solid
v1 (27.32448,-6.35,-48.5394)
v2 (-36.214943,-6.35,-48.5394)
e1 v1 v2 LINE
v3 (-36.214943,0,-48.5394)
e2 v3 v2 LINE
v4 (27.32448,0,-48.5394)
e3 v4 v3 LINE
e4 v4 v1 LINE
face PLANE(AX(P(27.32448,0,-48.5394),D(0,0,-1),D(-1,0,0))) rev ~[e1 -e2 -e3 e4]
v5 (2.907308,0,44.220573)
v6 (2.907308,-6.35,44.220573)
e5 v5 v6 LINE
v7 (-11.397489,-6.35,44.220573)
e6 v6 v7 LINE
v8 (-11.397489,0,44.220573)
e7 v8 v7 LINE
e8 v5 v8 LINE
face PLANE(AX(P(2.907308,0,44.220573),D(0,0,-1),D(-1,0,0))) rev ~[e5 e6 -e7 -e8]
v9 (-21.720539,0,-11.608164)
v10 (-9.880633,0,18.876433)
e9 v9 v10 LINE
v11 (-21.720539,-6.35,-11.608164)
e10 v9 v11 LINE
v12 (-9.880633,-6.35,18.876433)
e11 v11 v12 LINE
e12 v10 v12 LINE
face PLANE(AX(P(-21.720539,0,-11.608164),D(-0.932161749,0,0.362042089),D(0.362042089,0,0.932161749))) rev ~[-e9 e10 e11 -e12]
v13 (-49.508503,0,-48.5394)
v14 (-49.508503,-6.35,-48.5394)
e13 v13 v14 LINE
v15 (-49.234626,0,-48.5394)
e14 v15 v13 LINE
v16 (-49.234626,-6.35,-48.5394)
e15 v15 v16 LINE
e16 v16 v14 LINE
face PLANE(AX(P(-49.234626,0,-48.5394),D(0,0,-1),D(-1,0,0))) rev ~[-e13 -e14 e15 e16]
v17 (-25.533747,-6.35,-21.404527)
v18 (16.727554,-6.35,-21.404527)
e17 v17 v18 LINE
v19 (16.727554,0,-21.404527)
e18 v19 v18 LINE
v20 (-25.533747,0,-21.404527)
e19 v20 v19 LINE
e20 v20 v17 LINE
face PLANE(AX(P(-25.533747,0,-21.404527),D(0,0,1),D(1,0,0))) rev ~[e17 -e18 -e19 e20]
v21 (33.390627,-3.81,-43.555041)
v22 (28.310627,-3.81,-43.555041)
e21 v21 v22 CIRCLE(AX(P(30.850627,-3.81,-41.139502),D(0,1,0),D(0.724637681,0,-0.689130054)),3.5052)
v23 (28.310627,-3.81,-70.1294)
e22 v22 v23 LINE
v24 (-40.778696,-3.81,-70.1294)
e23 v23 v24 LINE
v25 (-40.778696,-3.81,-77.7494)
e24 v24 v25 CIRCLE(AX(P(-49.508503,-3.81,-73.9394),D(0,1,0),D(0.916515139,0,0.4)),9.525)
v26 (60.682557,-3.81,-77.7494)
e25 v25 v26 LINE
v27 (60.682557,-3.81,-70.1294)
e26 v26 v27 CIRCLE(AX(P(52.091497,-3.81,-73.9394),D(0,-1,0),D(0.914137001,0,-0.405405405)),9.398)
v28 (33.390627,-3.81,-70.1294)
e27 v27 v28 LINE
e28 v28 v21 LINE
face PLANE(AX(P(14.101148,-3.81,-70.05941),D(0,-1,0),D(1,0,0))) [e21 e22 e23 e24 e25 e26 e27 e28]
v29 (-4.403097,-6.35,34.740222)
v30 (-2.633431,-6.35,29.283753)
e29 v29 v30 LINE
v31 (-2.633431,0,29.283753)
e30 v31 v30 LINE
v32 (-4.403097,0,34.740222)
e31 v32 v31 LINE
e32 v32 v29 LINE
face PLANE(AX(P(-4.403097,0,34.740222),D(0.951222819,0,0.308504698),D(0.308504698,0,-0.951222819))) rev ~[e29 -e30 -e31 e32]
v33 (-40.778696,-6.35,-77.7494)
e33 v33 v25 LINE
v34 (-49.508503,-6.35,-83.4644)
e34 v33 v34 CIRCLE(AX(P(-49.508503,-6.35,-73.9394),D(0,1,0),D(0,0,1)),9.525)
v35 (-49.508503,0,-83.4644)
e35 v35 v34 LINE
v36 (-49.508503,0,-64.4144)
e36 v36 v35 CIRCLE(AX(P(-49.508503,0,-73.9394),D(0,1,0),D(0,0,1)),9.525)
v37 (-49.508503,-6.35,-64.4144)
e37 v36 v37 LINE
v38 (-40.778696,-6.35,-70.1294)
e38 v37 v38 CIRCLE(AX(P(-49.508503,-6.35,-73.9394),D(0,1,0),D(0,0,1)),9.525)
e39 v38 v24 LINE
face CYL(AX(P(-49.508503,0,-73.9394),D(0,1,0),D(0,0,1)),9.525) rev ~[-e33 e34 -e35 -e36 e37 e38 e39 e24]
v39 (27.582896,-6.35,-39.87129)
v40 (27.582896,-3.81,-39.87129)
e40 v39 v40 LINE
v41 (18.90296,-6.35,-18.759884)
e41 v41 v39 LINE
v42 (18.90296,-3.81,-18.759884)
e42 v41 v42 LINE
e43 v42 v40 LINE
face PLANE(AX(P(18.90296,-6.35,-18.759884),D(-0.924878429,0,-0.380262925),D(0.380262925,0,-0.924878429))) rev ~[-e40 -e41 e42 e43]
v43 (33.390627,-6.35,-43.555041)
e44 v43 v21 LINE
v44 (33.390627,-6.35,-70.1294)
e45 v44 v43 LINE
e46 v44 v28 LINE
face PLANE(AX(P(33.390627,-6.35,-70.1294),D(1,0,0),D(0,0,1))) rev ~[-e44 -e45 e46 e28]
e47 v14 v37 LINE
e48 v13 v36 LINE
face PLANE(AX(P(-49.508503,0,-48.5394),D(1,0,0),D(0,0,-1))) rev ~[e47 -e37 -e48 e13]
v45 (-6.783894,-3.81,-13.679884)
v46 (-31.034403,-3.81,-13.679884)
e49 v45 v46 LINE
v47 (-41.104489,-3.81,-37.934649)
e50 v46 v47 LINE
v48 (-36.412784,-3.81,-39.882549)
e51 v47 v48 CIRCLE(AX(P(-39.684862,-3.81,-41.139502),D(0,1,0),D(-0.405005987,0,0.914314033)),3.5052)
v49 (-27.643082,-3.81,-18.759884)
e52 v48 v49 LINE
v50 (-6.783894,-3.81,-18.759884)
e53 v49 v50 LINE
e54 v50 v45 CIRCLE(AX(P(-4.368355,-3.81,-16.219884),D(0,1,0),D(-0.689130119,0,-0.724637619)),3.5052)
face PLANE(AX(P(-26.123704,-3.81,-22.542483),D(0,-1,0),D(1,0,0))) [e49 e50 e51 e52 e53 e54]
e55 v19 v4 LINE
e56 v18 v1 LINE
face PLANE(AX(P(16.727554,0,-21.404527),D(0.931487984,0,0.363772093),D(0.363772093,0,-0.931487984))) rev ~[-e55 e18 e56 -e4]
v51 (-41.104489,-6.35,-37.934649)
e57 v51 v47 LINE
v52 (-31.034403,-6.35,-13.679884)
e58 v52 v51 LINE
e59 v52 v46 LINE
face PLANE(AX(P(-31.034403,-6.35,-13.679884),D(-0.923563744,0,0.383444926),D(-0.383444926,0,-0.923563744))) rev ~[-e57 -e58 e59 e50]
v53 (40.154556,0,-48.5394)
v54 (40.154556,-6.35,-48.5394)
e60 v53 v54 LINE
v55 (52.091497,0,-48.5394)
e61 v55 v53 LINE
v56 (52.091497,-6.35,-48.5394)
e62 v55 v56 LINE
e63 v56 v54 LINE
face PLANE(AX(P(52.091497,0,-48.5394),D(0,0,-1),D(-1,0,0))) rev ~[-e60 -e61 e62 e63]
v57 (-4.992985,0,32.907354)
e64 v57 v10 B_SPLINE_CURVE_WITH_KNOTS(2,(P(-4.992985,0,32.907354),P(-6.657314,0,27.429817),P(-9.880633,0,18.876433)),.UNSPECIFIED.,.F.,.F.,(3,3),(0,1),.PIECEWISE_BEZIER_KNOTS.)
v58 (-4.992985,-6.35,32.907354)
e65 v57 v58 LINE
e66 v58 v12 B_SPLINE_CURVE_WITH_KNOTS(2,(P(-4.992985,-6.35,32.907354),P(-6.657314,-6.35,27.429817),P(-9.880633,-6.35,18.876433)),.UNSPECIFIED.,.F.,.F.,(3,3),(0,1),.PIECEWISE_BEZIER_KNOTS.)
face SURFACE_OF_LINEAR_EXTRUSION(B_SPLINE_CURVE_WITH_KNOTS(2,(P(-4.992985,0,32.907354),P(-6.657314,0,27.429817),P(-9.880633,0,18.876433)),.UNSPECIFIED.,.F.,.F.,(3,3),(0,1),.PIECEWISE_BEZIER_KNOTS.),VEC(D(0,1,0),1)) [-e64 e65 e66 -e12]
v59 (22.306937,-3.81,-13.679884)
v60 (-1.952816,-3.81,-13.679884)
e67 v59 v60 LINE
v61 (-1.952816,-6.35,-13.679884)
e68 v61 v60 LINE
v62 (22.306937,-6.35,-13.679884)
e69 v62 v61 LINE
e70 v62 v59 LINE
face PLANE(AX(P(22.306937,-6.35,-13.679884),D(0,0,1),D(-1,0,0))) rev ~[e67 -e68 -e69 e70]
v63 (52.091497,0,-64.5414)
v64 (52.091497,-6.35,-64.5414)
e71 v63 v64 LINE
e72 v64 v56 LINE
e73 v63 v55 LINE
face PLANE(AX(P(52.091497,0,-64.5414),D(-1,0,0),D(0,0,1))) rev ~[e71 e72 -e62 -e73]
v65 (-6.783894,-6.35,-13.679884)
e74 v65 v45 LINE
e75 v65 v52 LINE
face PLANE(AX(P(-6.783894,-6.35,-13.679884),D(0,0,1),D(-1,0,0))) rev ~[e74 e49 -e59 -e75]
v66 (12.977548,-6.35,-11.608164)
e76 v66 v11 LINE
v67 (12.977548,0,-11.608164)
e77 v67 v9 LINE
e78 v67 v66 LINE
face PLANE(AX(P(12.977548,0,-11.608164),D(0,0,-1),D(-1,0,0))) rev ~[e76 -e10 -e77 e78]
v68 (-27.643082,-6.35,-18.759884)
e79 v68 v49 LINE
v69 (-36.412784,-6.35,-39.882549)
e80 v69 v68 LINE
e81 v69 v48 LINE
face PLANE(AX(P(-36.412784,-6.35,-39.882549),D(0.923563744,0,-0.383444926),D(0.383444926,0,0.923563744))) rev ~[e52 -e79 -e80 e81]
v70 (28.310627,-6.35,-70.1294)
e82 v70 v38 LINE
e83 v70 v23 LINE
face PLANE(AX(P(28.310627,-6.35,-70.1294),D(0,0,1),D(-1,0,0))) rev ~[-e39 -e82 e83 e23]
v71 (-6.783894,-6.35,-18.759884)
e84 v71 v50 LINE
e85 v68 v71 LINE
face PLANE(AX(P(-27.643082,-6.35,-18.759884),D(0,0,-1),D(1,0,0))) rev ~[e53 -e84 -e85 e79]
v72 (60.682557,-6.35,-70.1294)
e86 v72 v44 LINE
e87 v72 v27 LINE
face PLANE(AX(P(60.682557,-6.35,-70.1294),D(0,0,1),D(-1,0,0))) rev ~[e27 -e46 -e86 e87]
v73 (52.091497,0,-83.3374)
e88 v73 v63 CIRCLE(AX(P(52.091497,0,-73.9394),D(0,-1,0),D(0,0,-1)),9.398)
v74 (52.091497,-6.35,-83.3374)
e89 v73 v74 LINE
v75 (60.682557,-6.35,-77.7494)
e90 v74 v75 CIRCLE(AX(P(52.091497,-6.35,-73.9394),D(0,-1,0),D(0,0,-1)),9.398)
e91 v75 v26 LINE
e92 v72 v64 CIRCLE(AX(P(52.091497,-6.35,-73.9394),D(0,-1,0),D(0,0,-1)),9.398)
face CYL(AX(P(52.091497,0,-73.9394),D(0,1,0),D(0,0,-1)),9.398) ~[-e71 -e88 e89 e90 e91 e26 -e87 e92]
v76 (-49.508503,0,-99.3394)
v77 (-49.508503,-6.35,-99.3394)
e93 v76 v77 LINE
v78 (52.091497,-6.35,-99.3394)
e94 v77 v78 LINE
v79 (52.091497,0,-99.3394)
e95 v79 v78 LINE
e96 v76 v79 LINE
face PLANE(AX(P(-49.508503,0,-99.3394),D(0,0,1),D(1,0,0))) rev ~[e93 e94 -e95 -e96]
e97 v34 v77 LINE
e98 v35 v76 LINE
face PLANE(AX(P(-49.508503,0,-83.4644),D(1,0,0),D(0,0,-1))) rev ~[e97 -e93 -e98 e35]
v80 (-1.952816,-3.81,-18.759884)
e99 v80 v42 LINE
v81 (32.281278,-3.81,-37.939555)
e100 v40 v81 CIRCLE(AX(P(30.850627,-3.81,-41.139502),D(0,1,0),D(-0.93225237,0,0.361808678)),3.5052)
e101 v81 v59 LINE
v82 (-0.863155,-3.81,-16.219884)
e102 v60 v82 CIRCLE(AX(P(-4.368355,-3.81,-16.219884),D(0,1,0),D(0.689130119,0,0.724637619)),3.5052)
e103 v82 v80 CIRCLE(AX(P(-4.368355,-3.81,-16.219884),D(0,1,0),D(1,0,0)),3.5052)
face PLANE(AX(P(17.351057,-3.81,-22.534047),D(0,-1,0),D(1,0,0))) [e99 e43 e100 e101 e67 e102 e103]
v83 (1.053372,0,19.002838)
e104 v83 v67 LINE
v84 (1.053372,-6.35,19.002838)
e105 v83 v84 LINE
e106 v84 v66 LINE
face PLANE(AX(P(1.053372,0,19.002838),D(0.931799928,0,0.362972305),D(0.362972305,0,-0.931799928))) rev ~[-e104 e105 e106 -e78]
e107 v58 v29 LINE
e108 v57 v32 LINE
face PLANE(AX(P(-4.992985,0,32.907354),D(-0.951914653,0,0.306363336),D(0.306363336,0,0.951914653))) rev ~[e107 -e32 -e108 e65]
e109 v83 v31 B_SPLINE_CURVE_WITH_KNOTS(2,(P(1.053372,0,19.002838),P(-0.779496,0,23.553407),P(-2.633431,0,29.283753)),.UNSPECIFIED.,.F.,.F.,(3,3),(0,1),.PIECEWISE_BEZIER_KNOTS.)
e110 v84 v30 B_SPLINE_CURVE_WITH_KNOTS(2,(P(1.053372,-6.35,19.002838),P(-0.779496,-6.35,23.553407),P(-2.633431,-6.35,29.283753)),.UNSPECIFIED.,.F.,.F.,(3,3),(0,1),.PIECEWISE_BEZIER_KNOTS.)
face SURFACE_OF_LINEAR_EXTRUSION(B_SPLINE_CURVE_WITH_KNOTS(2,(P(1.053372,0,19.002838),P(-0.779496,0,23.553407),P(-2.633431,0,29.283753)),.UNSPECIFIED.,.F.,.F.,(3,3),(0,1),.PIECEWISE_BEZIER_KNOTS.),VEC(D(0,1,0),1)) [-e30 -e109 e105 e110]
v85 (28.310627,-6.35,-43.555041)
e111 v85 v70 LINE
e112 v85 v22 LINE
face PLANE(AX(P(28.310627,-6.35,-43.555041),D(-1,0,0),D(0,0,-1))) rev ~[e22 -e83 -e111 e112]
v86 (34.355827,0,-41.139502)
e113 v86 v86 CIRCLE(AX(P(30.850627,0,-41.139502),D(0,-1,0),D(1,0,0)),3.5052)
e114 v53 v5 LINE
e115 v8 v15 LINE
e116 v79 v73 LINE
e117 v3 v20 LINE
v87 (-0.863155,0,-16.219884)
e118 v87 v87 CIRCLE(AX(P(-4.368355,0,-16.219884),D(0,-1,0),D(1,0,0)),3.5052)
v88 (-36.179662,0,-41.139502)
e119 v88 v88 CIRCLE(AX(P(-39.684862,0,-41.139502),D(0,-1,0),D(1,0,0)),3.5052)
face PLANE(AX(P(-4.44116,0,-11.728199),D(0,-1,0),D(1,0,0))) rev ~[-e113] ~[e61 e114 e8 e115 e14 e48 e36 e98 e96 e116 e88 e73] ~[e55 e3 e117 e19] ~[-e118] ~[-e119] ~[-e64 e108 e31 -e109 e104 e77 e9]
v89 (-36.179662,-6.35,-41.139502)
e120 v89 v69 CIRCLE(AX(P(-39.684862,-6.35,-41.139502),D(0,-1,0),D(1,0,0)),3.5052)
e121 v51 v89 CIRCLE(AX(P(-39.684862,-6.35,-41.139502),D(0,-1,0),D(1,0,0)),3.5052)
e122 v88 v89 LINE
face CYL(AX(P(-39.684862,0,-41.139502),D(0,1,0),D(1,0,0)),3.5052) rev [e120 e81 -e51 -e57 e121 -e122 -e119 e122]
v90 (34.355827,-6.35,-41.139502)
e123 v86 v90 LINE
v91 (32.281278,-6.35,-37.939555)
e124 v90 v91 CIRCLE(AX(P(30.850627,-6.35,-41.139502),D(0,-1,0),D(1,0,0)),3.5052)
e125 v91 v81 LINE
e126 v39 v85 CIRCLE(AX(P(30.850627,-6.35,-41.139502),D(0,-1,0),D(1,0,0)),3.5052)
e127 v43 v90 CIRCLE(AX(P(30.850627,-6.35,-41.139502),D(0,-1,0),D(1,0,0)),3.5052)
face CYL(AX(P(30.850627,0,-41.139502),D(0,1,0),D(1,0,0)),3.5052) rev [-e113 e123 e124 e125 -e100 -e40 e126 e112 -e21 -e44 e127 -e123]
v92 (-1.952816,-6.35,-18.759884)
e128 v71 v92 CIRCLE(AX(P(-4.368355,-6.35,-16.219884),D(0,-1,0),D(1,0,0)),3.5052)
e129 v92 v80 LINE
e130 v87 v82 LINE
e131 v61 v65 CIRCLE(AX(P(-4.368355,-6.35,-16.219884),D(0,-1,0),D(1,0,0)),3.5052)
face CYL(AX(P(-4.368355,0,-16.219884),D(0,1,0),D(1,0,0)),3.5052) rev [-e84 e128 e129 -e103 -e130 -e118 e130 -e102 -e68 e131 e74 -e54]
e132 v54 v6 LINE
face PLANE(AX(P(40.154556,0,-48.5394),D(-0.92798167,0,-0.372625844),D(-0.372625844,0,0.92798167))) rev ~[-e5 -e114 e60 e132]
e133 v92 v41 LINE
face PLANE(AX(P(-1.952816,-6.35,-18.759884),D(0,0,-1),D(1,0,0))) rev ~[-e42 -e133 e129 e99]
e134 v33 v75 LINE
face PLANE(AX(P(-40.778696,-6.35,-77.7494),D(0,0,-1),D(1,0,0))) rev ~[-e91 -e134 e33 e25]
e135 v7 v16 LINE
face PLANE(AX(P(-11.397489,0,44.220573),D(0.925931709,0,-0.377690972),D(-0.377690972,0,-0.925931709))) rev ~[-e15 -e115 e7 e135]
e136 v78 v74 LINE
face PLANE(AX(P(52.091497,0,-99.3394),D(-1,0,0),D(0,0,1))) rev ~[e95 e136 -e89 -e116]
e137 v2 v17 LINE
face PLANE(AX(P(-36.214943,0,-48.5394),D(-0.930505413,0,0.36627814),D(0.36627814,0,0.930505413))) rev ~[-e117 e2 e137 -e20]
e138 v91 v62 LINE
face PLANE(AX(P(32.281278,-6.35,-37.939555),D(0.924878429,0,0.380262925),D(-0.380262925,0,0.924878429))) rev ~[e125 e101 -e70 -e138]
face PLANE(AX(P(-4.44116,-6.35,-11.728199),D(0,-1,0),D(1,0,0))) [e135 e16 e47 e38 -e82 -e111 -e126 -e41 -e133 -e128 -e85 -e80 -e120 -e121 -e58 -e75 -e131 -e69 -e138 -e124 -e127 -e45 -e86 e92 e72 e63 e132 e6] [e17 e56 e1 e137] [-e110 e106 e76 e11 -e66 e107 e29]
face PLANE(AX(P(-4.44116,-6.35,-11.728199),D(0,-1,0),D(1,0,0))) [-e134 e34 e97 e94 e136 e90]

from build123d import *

# Parameters (mm, degrees)
F0_R     = 3.5052
F1_DEPTH = 6.35
F3_DEPTH = 2.54


with BuildPart() as f1:
    # F0 (on Front) → F1 (new body)
    with BuildSketch(Plane.XZ):
        Polygon((-11.3974893229, 44.2205731771), (-49.2346257812, -48.5394), (-36.2149429687, -48.5394), (-25.533746875, -21.4045270833), (16.7275536458, -21.4045270833), (27.3244799479, -48.5394), (40.1545557292, -48.5394), (2.9073078125, 44.2205731771), align=None)
        with Locations((-39.6848618984, -41.1395020783)):
            Circle(F0_R, mode=Mode.SUBTRACT)
        with Locations((30.8506265283, -41.1395020783)):
            Circle(F0_R, mode=Mode.SUBTRACT)
        with Locations((-4.3683550321, -16.2198841572)):
            Circle(F0_R, mode=Mode.SUBTRACT)
        with BuildLine():
            Line((-4.9929851562, 32.9073536458), (-4.4030966146, 34.7402216146))
            Line((-4.4030966146, 34.7402216146), (-2.6334309896, 29.2837526042))
            add(Edge.make_bspline(
                [(1.0533723958, 19.0028380208), (-0.7794955729, 23.5534067708), (-2.6334309896, 29.2837526042)],
                knots=[0, 0, 0, 1, 1, 1], degree=2))
            Line((1.0533723958, 19.0028380208), (12.9775479167, -11.6081638021))
            Line((12.9775479167, -11.6081638021), (-21.7205388021, -11.6081638021))
            Line((-21.7205388021, -11.6081638021), (-9.8806330729, 18.8764333333))
            add(Edge.make_bspline(
                [(-4.9929851562, 32.9073536458), (-6.6573135417, 27.4298171875), (-9.8806330729, 18.8764333333)],
                knots=[0, 0, 0, 1, 1, 1], degree=2))
        make_face(mode=Mode.SUBTRACT)
        with BuildLine():
            Line((-49.2346257812, -48.5394), (-49.5085026042, -48.5394))
            Line((-49.5085026042, -48.5394), (-49.5085026042, -64.4144))
            ThreePointArc((-49.5085026042, -64.4144), (-39.9835026042, -73.9394), (-49.5085026042, -83.4644))
            Line((-49.5085026042, -83.4644), (-49.5085026042, -99.3394))
            Line((-49.5085026042, -99.3394), (52.0914973958, -99.3394))
            Line((52.0914973958, -99.3394), (52.0914973958, -83.3374))
            ThreePointArc((52.0914973958, -83.3374), (61.4894973958, -73.9394), (52.0914973958, -64.5414))
            Line((52.0914973958, -64.5414), (52.0914973958, -48.5394))
            Line((52.0914973958, -48.5394), (40.1545557292, -48.5394))
            Line((40.1545557292, -48.5394), (27.3244799479, -48.5394))
            Line((27.3244799479, -48.5394), (-36.2149429687, -48.5394))
            Line((-36.2149429687, -48.5394), (-49.2346257812, -48.5394))
        make_face()
    extrude(amount=F1_DEPTH)

    # F2 (on face) → F3 (cut)
    with BuildSketch(Plane.XZ.offset(6.35)):
        with BuildLine():
            ThreePointArc((-6.7838939248, -18.7598839402), (-7.8735550321, -16.2198841572), (-6.7838939248, -13.6798843741))
            Line((-6.7838939248, -13.6798843741), (-31.0344029758, -13.6798843741))
            Line((-31.0344029758, -13.6798843741), (-41.1044888823, -37.9346485299))
            ThreePointArc((-41.1044888823, -37.9346485299), (-38.340810813, -37.902226415), (-36.4127835596, -39.882549261))
            Line((-36.4127835596, -39.882549261), (-27.6430815337, -18.7598839402))
            Line((-27.6430815337, -18.7598839402), (-6.7838939248, -18.7598839402))
        make_face()
        with BuildLine():
            ThreePointArc((27.5828955219, -39.8712903019), (29.5177289249, -37.8976182095), (32.2812779405, -37.9395546449))
            Line((32.2812779405, -37.9395546449), (22.3069365793, -13.6798843741))
            Line((22.3069365793, -13.6798843741), (-1.9528161394, -13.6798843741))
            ThreePointArc((-1.9528161394, -13.6798843741), (-1.1470684904, -14.8379507085), (-0.8631550321, -16.2198841572))
            ThreePointArc((-0.8631550321, -16.2198841572), (-1.1470684904, -17.6018176059), (-1.9528161394, -18.7598839402))
            Line((-1.9528161394, -18.7598839402), (18.9029600028, -18.7598839402))
            Line((18.9029600028, -18.7598839402), (27.5828955219, -39.8712903019))
        make_face()
        with BuildLine():
            Line((33.3906265283, -70.1294), (33.3906265283, -43.5550407429))
            ThreePointArc((33.3906265283, -43.5550407429), (30.8506265283, -44.6447020783), (28.3106265283, -43.5550407429))
            Line((28.3106265283, -43.5550407429), (28.3106265283, -70.1294))
            Line((28.3106265283, -70.1294), (-40.7786959053, -70.1294))
            ThreePointArc((-40.7786959053, -70.1294), (-39.9835026042, -73.9394), (-40.7786959053, -77.7494))
            Line((-40.7786959053, -77.7494), (60.6825569347, -77.7494))
            ThreePointArc((60.6825569347, -77.7494), (61.4894973958, -73.9394), (60.6825569347, -70.1294))
            Line((60.6825569347, -70.1294), (33.3906265283, -70.1294))
        make_face()
    extrude(amount=-F3_DEPTH, mode=Mode.SUBTRACT)


solid = f1.part
